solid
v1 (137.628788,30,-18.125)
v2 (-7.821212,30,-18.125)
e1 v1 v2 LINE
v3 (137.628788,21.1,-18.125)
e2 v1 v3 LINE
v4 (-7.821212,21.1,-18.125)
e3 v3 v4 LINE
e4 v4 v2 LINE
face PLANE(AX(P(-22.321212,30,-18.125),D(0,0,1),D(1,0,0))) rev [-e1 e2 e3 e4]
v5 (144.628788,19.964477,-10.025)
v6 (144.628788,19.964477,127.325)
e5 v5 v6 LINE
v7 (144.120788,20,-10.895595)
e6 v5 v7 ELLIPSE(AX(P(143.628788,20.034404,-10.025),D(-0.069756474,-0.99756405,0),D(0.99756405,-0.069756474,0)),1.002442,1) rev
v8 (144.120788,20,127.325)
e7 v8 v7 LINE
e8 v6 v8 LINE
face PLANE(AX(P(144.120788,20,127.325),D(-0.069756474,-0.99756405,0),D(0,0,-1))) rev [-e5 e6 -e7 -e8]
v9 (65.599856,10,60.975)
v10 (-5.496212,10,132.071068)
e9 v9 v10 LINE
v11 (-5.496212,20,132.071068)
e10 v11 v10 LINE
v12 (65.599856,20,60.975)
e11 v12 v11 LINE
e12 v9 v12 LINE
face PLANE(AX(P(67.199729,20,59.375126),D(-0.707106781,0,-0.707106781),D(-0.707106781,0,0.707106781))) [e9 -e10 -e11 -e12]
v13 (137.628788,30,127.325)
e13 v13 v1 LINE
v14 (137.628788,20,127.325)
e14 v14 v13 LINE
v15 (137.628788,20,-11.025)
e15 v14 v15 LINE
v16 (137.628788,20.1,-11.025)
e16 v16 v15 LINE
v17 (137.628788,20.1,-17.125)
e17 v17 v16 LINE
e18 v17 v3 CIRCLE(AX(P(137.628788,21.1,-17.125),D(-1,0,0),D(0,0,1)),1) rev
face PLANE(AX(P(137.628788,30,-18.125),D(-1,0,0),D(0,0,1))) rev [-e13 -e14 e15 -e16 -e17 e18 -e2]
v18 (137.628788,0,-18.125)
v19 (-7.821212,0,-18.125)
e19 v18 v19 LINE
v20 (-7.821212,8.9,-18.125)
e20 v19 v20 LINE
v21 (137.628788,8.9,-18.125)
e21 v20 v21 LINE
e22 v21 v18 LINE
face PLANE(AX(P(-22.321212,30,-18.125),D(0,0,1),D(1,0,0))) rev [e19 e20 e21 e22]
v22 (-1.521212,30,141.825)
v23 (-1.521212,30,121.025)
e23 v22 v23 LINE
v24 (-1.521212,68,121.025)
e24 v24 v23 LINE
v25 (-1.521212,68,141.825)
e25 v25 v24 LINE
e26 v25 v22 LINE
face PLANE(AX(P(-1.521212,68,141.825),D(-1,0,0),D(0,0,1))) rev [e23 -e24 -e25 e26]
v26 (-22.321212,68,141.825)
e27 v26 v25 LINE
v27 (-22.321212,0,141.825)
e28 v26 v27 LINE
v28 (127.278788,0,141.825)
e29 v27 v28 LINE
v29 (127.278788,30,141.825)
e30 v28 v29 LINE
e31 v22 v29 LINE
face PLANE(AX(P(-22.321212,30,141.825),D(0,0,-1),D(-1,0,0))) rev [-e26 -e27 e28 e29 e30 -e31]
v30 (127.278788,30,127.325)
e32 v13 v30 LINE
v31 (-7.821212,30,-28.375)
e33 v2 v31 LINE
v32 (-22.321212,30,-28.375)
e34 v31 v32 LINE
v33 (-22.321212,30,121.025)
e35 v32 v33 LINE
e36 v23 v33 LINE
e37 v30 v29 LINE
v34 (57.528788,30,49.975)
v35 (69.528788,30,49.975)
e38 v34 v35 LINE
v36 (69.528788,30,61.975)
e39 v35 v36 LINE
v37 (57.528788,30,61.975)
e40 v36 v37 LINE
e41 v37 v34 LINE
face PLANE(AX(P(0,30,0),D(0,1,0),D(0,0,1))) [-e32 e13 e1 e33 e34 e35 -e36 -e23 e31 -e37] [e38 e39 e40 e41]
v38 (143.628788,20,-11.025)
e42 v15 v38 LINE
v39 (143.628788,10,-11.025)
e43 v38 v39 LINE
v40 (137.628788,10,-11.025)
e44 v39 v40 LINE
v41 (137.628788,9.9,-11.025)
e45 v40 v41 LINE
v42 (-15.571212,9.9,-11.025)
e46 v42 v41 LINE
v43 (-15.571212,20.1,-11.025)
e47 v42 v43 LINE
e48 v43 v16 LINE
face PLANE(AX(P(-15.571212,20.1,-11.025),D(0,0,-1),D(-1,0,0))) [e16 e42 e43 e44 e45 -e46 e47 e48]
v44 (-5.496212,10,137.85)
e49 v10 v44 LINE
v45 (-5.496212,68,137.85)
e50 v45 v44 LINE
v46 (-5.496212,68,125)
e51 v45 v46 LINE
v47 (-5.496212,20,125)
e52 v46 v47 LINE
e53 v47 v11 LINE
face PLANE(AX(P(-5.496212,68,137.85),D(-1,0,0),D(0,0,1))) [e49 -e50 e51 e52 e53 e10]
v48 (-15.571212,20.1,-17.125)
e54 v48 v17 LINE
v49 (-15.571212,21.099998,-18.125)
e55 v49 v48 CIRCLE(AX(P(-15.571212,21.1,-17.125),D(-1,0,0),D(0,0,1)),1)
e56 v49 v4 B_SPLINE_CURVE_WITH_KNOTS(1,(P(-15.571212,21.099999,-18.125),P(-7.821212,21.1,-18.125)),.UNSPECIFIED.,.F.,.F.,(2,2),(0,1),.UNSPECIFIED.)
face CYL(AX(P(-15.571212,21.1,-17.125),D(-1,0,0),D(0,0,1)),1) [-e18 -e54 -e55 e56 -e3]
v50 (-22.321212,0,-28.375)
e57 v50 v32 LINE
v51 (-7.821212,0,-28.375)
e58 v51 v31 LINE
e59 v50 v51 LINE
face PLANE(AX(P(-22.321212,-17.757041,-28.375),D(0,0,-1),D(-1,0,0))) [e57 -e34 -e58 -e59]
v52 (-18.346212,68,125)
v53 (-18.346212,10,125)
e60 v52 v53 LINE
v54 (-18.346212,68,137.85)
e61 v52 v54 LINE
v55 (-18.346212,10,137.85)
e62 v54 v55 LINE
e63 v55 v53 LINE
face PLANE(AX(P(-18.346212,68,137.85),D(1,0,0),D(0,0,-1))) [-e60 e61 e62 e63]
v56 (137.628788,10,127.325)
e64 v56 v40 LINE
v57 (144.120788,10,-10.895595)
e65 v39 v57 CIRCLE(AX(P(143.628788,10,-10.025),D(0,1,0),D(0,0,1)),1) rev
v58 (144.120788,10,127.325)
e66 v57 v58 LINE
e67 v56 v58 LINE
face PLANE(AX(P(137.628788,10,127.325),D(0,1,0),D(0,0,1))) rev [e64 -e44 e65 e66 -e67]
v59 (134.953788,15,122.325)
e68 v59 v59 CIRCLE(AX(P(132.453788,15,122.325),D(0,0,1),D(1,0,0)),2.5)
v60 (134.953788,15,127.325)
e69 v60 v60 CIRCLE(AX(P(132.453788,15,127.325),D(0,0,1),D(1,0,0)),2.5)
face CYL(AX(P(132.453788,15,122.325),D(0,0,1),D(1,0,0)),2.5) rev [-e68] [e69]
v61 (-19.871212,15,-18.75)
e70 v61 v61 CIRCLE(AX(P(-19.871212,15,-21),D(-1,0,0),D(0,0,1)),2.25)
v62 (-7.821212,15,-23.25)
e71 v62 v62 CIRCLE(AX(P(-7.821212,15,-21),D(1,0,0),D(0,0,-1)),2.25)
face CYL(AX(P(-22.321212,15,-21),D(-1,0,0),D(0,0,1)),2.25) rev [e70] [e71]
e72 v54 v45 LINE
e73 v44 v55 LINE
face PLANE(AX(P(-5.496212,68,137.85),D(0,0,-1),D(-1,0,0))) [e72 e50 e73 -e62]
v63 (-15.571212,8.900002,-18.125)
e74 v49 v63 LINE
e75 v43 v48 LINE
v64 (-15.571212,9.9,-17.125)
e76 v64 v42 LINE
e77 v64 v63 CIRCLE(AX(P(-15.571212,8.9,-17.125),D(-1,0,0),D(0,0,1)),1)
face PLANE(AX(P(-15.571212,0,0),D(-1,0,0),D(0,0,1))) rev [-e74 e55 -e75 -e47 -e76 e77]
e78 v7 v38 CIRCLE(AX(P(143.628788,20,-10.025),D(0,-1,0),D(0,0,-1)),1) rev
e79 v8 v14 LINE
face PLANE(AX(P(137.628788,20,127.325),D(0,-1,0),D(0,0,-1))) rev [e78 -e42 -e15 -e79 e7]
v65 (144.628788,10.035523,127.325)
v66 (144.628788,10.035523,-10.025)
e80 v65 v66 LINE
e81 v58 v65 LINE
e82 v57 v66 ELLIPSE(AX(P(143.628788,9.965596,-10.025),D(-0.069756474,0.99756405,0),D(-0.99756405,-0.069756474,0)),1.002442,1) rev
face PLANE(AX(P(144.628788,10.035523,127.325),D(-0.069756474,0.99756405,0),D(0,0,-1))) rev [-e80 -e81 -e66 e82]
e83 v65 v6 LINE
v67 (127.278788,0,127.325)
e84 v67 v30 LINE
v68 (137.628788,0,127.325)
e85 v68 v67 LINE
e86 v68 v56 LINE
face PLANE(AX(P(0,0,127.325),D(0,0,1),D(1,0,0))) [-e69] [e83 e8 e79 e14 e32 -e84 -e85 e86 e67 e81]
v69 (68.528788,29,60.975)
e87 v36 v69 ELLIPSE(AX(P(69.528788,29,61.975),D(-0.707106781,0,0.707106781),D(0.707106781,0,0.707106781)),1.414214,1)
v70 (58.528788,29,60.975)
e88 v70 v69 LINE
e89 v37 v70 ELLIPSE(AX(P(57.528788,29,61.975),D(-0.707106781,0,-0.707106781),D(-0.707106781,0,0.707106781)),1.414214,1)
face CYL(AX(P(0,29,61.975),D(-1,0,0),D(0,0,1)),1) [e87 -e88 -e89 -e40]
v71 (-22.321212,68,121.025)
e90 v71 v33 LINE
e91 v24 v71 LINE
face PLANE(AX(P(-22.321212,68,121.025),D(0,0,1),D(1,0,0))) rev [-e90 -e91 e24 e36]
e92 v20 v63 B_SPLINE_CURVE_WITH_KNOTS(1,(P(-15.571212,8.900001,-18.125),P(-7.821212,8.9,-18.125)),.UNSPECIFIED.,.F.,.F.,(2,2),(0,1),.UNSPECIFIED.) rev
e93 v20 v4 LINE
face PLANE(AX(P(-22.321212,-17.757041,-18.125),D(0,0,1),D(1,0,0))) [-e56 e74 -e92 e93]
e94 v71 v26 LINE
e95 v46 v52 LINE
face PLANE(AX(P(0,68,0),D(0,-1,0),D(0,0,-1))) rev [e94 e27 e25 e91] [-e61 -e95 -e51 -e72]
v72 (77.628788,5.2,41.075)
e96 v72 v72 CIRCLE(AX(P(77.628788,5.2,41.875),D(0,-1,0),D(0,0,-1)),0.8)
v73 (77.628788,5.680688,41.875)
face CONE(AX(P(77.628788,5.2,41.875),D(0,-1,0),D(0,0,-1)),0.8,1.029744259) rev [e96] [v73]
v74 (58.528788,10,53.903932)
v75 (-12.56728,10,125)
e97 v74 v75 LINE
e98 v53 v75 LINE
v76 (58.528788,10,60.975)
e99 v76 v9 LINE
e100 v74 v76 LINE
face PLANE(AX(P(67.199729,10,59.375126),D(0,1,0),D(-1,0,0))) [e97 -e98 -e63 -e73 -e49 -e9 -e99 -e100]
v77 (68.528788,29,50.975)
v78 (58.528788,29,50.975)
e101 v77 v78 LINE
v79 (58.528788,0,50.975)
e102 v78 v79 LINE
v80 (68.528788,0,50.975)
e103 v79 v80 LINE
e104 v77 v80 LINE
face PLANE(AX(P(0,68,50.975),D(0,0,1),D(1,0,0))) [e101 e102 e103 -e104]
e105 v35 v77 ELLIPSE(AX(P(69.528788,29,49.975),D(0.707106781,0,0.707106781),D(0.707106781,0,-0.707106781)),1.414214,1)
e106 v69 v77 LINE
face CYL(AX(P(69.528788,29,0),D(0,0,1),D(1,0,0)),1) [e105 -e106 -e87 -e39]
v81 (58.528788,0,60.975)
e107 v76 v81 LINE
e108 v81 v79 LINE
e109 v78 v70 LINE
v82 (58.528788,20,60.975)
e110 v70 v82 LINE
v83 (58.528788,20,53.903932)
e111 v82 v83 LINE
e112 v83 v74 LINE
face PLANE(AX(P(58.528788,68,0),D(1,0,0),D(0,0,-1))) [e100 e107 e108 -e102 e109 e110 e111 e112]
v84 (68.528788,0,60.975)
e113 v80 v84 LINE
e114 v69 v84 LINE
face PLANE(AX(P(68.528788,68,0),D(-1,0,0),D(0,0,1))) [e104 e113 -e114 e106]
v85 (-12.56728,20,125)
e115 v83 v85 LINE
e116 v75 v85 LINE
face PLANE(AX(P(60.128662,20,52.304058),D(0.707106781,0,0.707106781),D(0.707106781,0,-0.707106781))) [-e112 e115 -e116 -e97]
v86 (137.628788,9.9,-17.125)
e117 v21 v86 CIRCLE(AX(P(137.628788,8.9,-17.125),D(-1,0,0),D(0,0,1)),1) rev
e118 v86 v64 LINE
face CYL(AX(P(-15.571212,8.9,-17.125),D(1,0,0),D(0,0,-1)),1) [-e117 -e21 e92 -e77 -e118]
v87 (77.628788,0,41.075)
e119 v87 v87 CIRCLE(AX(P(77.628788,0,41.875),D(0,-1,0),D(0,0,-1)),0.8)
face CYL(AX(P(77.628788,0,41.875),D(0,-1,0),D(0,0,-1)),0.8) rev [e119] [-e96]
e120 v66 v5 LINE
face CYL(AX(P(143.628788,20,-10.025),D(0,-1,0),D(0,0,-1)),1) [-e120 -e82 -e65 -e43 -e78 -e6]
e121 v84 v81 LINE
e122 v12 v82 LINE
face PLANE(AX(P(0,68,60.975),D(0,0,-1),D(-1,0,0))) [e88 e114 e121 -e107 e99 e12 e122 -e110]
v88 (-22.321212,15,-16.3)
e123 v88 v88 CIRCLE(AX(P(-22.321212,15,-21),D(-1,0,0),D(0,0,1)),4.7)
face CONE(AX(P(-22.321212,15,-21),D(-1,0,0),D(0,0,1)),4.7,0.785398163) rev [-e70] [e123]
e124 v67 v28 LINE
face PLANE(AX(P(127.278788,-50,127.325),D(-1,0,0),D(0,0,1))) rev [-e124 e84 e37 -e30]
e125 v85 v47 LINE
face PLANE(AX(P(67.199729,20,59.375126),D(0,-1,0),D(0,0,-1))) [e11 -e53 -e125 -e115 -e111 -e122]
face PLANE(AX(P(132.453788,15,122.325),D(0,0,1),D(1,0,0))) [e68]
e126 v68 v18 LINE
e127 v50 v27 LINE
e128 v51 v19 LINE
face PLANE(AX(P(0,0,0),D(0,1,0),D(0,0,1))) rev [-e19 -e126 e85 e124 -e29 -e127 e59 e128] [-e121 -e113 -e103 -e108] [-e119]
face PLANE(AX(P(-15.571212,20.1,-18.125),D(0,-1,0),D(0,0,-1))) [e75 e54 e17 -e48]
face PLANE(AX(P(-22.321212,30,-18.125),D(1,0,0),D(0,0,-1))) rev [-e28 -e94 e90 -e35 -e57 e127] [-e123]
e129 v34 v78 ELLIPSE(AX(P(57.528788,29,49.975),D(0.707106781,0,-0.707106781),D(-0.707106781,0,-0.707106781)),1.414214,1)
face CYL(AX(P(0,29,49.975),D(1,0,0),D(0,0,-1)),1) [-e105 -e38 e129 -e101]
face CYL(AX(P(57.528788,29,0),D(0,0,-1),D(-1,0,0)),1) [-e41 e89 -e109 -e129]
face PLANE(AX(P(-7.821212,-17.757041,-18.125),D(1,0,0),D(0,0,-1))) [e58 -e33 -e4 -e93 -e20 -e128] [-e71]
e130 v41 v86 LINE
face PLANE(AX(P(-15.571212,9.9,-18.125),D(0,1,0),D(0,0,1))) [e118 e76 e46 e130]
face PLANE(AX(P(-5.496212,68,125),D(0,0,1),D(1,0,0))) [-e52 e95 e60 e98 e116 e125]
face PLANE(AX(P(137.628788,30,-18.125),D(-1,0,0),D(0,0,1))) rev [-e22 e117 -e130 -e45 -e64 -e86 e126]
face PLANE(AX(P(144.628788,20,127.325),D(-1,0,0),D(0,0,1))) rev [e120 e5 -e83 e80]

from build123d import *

# Parameters (mm, degrees)
SKETCH1_W                                           = 159.95
SKETCH1_H                                           = 159.95
BOSS_EXTRUDE2_DEPTH                                 = 30
SKETCH3_W                                           = 7
SKETCH3_H                                           = 10
BOSS_EXTRUDE4_DEPTH                                 = 145.45
CHAMFER1_SIZE                                       = 0.508
CHAMFER1_SIZE2                                      = 0.03552282
CHAMFER2_SIZE                                       = 0.508
CHAMFER2_SIZE2                                      = 0.03552282
SKETCH4_W                                           = 7.1
SKETCH4_H                                           = 10.2
CUT_EXTRUDE6_DEPTH                                  = 160.2
FILLET1_R                                           = 1
SKETCH6_W                                           = 10.35
SKETCH6_H                                           = 14.5
CUT_EXTRUDE7_DEPTH                                  = 80
BOSS_EXTRUDE5_REACH                                 = 206.773
SKETCH7_W                                           = 14.5
SKETCH7_H                                           = 10.25
CSK_FOR_M4_COUNTERSUNK_FLAT_HEAD_SCREW1_D           = 4.5
CSK_FOR_M4_COUNTERSUNK_FLAT_HEAD_SCREW1_DEPTH       = 16
CSK_FOR_M4_COUNTERSUNK_FLAT_HEAD_SCREW1_CSINK_D     = 9.4
CSK_FOR_M4_COUNTERSUNK_FLAT_HEAD_SCREW1_CSINK_ANGLE = 90
CSK_FOR_M4_COUNTERSUNK_FLAT_HEAD_SCREW1_TIP         = 1.351936393
SKETCH12_R                                          = 2.5
CUT_EXTRUDE9_DEPTH                                  = 5
FILLET2_START                                       = -15.571212121
FILLET2_DEPTH                                       = 154.571212121
FILLET3_START                                       = -15.571212121
FILLET3_DEPTH                                       = 154.571212121
M2_TAPPED_HOLE1_D                                   = 1.6
M2_TAPPED_HOLE1_DEPTH                               = 5.2
M2_TAPPED_HOLE1_TIP                                 = 0.480688495
SKETCH29_W                                          = 20.8
SKETCH29_H                                          = 20.8
SKETCH29_W_2                                        = 12.85
SKETCH29_H_2                                        = 12.85
BOSS_EXTRUDE6_DEPTH                                 = 38
CUT_EXTRUDE15_DEPTH                                 = 207.096620322
CUT_EXTRUDE15_DEPTH_BACK                            = 207.096620322
SKETCH26_W                                          = 10
SKETCH26_H                                          = 10
CUT_EXTRUDE16_DEPTH                                 = 8.5
CUT_EXTRUDE16_DEPTH_BACK                            = 98.4
SKETCH30_W                                          = 10
SKETCH30_H                                          = 10
SKETCH31_W                                          = 12.85
SKETCH31_H                                          = 12.85
CUT_EXTRUDE17_DEPTH                                 = 20
FILLET4_R                                           = 1


with BuildPart() as part:
    # Sketch1 → Boss-Extrude2 (new body)
    with BuildSketch(Plane(origin=(0, 0, 0), x_dir=(1, 0, 0), z_dir=(0, 1, 0))):
        with Locations((57.653787879, -61.85)):
            Rectangle(SKETCH1_W, SKETCH1_H)
    extrude(amount=BOSS_EXTRUDE2_DEPTH)

    # Sketch3 → Boss-Extrude4 (add)
    with BuildSketch(Plane.XY.offset(-18.125)):
        with Locations((141.128787879, 15)):
            Rectangle(SKETCH3_W, SKETCH3_H)
    extrude(amount=BOSS_EXTRUDE4_DEPTH)

    # Chamfer1
    chamfer1_edges = [part.edges().sort_by_distance(p)[0] for p in [
        (144.628787879, 20, 54.6),
    ]]
    chamfer1_side = [part.faces().sort_by_distance(p)[0] for p in [
        (141.128787879, 20, 54.6),
    ]]
    chamfer(chamfer1_edges, length=CHAMFER1_SIZE, length2=CHAMFER1_SIZE2, reference=chamfer1_side[0])

    # Chamfer2
    chamfer2_edges = [part.edges().sort_by_distance(p)[0] for p in [
        (144.628787879, 10, 54.6),
    ]]
    chamfer2_side = [part.faces().sort_by_distance(p)[0] for p in [
        (141.128787879, 10, 54.6),
    ]]
    chamfer(chamfer2_edges, length=CHAMFER2_SIZE, length2=CHAMFER2_SIZE2, reference=chamfer2_side[0])

    # Sketch4 → Cut-Extrude6 (cut)
    with BuildSketch(Plane.ZY.offset(-144.628787879)):
        with Locations((-14.575, 15)):
            Rectangle(SKETCH4_W, SKETCH4_H)
    extrude(amount=CUT_EXTRUDE6_DEPTH, mode=Mode.SUBTRACT)

    # Fillet1
    fillet1_edges = [part.edges().sort_by_distance(p)[0] for p in [
        (144.628787879, 15, -11.025),
    ]]
    fillet(fillet1_edges, radius=FILLET1_R)

    # Sketch6 → Cut-Extrude7 (cut)
    with BuildSketch(Plane(origin=(0, 30, 0), x_dir=(1, 0, 0), z_dir=(0, 1, 0))):
        with Locations((132.453787879, -134.575)):
            Rectangle(SKETCH6_W, SKETCH6_H)
    extrude(amount=-CUT_EXTRUDE7_DEPTH, mode=Mode.SUBTRACT)

    # Boss-Extrude5: up to this face of the body (flat: up to its plane)
    boss_extrude5_end = Plane(part.part.faces().sort_by_distance((57.212424271, 0, 61.420880102))[0])
    # Sketch7 → Boss-Extrude5 (add, up to the picked face)
    with BuildSketch(Plane(origin=(0, 30, 0), x_dir=(1, 0, 0), z_dir=(0, 1, 0)), mode=Mode.PRIVATE) as boss_extrude5_sk1:
        with Locations((-15.071212121, 23.25)):
            Rectangle(SKETCH7_W, SKETCH7_H)
    boss_extrude5_tool1 = split(extrude(boss_extrude5_sk1.sketch, amount=-BOSS_EXTRUDE5_REACH, mode=Mode.PRIVATE), bisect_by=boss_extrude5_end, keep=Keep.BOTH, mode=Mode.PRIVATE)
    add(boss_extrude5_tool1.solids().sort_by(Axis((-15.071212, 30, -23.25), (0, -1, 0)))[0])

    # CSK for M4 Countersunk Flat Head Screw1
    with Locations(Plane.ZY.offset(22.321212121)):
        with Locations((-21, 15)):
            CounterSinkHole(CSK_FOR_M4_COUNTERSUNK_FLAT_HEAD_SCREW1_D / 2, CSK_FOR_M4_COUNTERSUNK_FLAT_HEAD_SCREW1_CSINK_D / 2, depth=CSK_FOR_M4_COUNTERSUNK_FLAT_HEAD_SCREW1_DEPTH, counter_sink_angle=CSK_FOR_M4_COUNTERSUNK_FLAT_HEAD_SCREW1_CSINK_ANGLE)
            with Locations((0, 0, -(CSK_FOR_M4_COUNTERSUNK_FLAT_HEAD_SCREW1_DEPTH + CSK_FOR_M4_COUNTERSUNK_FLAT_HEAD_SCREW1_TIP / 2))):  # 118° drill point
                Cone(0, CSK_FOR_M4_COUNTERSUNK_FLAT_HEAD_SCREW1_D / 2, CSK_FOR_M4_COUNTERSUNK_FLAT_HEAD_SCREW1_TIP, mode=Mode.SUBTRACT)

    # Sketch12 → Cut-Extrude9 (cut)
    with BuildSketch(Plane.XY.offset(127.325)):
        with Locations((132.453787879, 15)):
            Circle(SKETCH12_R)
    extrude(amount=-CUT_EXTRUDE9_DEPTH, mode=Mode.SUBTRACT)

    # Fillet2: read off the stored shape, not the designer's step
    # Fillet2 outline → Fillet2 (cut)
    with BuildSketch(Plane.YZ.offset(FILLET2_START)):
        with BuildLine():
            Line((20.1, -18.125), (21.1, -18.125))
            ThreePointArc((21.1, -18.125), (20.392893219, -17.832106781), (20.1, -17.125))
            Line((20.1, -17.125), (20.1, -18.125))
        make_face()
    extrude(amount=FILLET2_DEPTH, mode=Mode.SUBTRACT)

    # Fillet3: read off the stored shape, not the designer's step
    # Fillet3 outline → Fillet3 (cut)
    with BuildSketch(Plane.YZ.offset(FILLET3_START)):
        with BuildLine():
            ThreePointArc((9.9, -17.125), (9.607106781, -17.832106781), (8.9, -18.125))
            Line((8.9, -18.125), (9.9, -18.125))
            Line((9.9, -18.125), (9.9, -17.125))
        make_face()
    extrude(amount=FILLET3_DEPTH, mode=Mode.SUBTRACT)

    # M2 Tapped Hole1
    with Locations(Plane.XZ):
        with Locations((77.628787879, 41.875)):
            Hole(M2_TAPPED_HOLE1_D / 2, depth=M2_TAPPED_HOLE1_DEPTH)
            with Locations((0, 0, -(M2_TAPPED_HOLE1_DEPTH + M2_TAPPED_HOLE1_TIP / 2))):  # 118° drill point
                Cone(0, M2_TAPPED_HOLE1_D / 2, M2_TAPPED_HOLE1_TIP, mode=Mode.SUBTRACT)

    # Sketch29 → Boss-Extrude6 (add)
    with BuildSketch(Plane(origin=(0, 30, 0), x_dir=(1, 0, 0), z_dir=(0, 1, 0))):
        with Locations((-11.921212121, -131.425)):
            Rectangle(SKETCH29_W, SKETCH29_H)
        with Locations((-11.921212121, -131.425)):
            Rectangle(SKETCH29_W_2, SKETCH29_H_2, mode=Mode.SUBTRACT)
    extrude(amount=BOSS_EXTRUDE6_DEPTH)

    # Sketch26 → Cut-Extrude15 (cut, two sides: drawn at the far end of the back side and taken through both)
    with BuildSketch(Plane(origin=(0, 30, 0), x_dir=(1, 0, 0), z_dir=(0, 1, 0)).offset(-CUT_EXTRUDE15_DEPTH_BACK)):
        with Locations((63.528787879, -55.975)):
            Rectangle(SKETCH26_W, SKETCH26_H)
    extrude(amount=CUT_EXTRUDE15_DEPTH + CUT_EXTRUDE15_DEPTH_BACK, mode=Mode.SUBTRACT)

    # Sketch30 → Cut-Extrude16 (cut, two sides: drawn at the far end of the back side and taken through both)
    with BuildSketch(Plane(origin=(-2.098106061, 0, 2.098106061), x_dir=(-0.7071067811865477, 0, -0.7071067811865475), z_dir=(0.7071067811865475, 0, -0.7071067811865477)).offset(-CUT_EXTRUDE16_DEPTH_BACK)):
        with Locations((-84.501938787, 15)):
            Rectangle(SKETCH30_W, SKETCH30_H)
    extrude(amount=CUT_EXTRUDE16_DEPTH + CUT_EXTRUDE16_DEPTH_BACK, mode=Mode.SUBTRACT)

    # Sketch31 → Cut-Extrude17 (cut)
    with BuildSketch(Plane(origin=(0, 30, 0), x_dir=(1, 0, 0), z_dir=(0, 1, 0))):
        with Locations((-11.921212121, -131.425)):
            Rectangle(SKETCH31_W, SKETCH31_H)
    extrude(amount=-CUT_EXTRUDE17_DEPTH, mode=Mode.SUBTRACT)

    # Fillet4
    fillet4_edges = [part.edges().sort_by_distance(p)[0] for p in [
        (58.528787879, 30, 55.975),
        (63.528787879, 30, 60.975),
        (68.528787879, 30, 55.975),
        (63.528787879, 30, 50.975),
    ]]
    fillet(fillet4_edges, radius=FILLET4_R)


solid = part.part
